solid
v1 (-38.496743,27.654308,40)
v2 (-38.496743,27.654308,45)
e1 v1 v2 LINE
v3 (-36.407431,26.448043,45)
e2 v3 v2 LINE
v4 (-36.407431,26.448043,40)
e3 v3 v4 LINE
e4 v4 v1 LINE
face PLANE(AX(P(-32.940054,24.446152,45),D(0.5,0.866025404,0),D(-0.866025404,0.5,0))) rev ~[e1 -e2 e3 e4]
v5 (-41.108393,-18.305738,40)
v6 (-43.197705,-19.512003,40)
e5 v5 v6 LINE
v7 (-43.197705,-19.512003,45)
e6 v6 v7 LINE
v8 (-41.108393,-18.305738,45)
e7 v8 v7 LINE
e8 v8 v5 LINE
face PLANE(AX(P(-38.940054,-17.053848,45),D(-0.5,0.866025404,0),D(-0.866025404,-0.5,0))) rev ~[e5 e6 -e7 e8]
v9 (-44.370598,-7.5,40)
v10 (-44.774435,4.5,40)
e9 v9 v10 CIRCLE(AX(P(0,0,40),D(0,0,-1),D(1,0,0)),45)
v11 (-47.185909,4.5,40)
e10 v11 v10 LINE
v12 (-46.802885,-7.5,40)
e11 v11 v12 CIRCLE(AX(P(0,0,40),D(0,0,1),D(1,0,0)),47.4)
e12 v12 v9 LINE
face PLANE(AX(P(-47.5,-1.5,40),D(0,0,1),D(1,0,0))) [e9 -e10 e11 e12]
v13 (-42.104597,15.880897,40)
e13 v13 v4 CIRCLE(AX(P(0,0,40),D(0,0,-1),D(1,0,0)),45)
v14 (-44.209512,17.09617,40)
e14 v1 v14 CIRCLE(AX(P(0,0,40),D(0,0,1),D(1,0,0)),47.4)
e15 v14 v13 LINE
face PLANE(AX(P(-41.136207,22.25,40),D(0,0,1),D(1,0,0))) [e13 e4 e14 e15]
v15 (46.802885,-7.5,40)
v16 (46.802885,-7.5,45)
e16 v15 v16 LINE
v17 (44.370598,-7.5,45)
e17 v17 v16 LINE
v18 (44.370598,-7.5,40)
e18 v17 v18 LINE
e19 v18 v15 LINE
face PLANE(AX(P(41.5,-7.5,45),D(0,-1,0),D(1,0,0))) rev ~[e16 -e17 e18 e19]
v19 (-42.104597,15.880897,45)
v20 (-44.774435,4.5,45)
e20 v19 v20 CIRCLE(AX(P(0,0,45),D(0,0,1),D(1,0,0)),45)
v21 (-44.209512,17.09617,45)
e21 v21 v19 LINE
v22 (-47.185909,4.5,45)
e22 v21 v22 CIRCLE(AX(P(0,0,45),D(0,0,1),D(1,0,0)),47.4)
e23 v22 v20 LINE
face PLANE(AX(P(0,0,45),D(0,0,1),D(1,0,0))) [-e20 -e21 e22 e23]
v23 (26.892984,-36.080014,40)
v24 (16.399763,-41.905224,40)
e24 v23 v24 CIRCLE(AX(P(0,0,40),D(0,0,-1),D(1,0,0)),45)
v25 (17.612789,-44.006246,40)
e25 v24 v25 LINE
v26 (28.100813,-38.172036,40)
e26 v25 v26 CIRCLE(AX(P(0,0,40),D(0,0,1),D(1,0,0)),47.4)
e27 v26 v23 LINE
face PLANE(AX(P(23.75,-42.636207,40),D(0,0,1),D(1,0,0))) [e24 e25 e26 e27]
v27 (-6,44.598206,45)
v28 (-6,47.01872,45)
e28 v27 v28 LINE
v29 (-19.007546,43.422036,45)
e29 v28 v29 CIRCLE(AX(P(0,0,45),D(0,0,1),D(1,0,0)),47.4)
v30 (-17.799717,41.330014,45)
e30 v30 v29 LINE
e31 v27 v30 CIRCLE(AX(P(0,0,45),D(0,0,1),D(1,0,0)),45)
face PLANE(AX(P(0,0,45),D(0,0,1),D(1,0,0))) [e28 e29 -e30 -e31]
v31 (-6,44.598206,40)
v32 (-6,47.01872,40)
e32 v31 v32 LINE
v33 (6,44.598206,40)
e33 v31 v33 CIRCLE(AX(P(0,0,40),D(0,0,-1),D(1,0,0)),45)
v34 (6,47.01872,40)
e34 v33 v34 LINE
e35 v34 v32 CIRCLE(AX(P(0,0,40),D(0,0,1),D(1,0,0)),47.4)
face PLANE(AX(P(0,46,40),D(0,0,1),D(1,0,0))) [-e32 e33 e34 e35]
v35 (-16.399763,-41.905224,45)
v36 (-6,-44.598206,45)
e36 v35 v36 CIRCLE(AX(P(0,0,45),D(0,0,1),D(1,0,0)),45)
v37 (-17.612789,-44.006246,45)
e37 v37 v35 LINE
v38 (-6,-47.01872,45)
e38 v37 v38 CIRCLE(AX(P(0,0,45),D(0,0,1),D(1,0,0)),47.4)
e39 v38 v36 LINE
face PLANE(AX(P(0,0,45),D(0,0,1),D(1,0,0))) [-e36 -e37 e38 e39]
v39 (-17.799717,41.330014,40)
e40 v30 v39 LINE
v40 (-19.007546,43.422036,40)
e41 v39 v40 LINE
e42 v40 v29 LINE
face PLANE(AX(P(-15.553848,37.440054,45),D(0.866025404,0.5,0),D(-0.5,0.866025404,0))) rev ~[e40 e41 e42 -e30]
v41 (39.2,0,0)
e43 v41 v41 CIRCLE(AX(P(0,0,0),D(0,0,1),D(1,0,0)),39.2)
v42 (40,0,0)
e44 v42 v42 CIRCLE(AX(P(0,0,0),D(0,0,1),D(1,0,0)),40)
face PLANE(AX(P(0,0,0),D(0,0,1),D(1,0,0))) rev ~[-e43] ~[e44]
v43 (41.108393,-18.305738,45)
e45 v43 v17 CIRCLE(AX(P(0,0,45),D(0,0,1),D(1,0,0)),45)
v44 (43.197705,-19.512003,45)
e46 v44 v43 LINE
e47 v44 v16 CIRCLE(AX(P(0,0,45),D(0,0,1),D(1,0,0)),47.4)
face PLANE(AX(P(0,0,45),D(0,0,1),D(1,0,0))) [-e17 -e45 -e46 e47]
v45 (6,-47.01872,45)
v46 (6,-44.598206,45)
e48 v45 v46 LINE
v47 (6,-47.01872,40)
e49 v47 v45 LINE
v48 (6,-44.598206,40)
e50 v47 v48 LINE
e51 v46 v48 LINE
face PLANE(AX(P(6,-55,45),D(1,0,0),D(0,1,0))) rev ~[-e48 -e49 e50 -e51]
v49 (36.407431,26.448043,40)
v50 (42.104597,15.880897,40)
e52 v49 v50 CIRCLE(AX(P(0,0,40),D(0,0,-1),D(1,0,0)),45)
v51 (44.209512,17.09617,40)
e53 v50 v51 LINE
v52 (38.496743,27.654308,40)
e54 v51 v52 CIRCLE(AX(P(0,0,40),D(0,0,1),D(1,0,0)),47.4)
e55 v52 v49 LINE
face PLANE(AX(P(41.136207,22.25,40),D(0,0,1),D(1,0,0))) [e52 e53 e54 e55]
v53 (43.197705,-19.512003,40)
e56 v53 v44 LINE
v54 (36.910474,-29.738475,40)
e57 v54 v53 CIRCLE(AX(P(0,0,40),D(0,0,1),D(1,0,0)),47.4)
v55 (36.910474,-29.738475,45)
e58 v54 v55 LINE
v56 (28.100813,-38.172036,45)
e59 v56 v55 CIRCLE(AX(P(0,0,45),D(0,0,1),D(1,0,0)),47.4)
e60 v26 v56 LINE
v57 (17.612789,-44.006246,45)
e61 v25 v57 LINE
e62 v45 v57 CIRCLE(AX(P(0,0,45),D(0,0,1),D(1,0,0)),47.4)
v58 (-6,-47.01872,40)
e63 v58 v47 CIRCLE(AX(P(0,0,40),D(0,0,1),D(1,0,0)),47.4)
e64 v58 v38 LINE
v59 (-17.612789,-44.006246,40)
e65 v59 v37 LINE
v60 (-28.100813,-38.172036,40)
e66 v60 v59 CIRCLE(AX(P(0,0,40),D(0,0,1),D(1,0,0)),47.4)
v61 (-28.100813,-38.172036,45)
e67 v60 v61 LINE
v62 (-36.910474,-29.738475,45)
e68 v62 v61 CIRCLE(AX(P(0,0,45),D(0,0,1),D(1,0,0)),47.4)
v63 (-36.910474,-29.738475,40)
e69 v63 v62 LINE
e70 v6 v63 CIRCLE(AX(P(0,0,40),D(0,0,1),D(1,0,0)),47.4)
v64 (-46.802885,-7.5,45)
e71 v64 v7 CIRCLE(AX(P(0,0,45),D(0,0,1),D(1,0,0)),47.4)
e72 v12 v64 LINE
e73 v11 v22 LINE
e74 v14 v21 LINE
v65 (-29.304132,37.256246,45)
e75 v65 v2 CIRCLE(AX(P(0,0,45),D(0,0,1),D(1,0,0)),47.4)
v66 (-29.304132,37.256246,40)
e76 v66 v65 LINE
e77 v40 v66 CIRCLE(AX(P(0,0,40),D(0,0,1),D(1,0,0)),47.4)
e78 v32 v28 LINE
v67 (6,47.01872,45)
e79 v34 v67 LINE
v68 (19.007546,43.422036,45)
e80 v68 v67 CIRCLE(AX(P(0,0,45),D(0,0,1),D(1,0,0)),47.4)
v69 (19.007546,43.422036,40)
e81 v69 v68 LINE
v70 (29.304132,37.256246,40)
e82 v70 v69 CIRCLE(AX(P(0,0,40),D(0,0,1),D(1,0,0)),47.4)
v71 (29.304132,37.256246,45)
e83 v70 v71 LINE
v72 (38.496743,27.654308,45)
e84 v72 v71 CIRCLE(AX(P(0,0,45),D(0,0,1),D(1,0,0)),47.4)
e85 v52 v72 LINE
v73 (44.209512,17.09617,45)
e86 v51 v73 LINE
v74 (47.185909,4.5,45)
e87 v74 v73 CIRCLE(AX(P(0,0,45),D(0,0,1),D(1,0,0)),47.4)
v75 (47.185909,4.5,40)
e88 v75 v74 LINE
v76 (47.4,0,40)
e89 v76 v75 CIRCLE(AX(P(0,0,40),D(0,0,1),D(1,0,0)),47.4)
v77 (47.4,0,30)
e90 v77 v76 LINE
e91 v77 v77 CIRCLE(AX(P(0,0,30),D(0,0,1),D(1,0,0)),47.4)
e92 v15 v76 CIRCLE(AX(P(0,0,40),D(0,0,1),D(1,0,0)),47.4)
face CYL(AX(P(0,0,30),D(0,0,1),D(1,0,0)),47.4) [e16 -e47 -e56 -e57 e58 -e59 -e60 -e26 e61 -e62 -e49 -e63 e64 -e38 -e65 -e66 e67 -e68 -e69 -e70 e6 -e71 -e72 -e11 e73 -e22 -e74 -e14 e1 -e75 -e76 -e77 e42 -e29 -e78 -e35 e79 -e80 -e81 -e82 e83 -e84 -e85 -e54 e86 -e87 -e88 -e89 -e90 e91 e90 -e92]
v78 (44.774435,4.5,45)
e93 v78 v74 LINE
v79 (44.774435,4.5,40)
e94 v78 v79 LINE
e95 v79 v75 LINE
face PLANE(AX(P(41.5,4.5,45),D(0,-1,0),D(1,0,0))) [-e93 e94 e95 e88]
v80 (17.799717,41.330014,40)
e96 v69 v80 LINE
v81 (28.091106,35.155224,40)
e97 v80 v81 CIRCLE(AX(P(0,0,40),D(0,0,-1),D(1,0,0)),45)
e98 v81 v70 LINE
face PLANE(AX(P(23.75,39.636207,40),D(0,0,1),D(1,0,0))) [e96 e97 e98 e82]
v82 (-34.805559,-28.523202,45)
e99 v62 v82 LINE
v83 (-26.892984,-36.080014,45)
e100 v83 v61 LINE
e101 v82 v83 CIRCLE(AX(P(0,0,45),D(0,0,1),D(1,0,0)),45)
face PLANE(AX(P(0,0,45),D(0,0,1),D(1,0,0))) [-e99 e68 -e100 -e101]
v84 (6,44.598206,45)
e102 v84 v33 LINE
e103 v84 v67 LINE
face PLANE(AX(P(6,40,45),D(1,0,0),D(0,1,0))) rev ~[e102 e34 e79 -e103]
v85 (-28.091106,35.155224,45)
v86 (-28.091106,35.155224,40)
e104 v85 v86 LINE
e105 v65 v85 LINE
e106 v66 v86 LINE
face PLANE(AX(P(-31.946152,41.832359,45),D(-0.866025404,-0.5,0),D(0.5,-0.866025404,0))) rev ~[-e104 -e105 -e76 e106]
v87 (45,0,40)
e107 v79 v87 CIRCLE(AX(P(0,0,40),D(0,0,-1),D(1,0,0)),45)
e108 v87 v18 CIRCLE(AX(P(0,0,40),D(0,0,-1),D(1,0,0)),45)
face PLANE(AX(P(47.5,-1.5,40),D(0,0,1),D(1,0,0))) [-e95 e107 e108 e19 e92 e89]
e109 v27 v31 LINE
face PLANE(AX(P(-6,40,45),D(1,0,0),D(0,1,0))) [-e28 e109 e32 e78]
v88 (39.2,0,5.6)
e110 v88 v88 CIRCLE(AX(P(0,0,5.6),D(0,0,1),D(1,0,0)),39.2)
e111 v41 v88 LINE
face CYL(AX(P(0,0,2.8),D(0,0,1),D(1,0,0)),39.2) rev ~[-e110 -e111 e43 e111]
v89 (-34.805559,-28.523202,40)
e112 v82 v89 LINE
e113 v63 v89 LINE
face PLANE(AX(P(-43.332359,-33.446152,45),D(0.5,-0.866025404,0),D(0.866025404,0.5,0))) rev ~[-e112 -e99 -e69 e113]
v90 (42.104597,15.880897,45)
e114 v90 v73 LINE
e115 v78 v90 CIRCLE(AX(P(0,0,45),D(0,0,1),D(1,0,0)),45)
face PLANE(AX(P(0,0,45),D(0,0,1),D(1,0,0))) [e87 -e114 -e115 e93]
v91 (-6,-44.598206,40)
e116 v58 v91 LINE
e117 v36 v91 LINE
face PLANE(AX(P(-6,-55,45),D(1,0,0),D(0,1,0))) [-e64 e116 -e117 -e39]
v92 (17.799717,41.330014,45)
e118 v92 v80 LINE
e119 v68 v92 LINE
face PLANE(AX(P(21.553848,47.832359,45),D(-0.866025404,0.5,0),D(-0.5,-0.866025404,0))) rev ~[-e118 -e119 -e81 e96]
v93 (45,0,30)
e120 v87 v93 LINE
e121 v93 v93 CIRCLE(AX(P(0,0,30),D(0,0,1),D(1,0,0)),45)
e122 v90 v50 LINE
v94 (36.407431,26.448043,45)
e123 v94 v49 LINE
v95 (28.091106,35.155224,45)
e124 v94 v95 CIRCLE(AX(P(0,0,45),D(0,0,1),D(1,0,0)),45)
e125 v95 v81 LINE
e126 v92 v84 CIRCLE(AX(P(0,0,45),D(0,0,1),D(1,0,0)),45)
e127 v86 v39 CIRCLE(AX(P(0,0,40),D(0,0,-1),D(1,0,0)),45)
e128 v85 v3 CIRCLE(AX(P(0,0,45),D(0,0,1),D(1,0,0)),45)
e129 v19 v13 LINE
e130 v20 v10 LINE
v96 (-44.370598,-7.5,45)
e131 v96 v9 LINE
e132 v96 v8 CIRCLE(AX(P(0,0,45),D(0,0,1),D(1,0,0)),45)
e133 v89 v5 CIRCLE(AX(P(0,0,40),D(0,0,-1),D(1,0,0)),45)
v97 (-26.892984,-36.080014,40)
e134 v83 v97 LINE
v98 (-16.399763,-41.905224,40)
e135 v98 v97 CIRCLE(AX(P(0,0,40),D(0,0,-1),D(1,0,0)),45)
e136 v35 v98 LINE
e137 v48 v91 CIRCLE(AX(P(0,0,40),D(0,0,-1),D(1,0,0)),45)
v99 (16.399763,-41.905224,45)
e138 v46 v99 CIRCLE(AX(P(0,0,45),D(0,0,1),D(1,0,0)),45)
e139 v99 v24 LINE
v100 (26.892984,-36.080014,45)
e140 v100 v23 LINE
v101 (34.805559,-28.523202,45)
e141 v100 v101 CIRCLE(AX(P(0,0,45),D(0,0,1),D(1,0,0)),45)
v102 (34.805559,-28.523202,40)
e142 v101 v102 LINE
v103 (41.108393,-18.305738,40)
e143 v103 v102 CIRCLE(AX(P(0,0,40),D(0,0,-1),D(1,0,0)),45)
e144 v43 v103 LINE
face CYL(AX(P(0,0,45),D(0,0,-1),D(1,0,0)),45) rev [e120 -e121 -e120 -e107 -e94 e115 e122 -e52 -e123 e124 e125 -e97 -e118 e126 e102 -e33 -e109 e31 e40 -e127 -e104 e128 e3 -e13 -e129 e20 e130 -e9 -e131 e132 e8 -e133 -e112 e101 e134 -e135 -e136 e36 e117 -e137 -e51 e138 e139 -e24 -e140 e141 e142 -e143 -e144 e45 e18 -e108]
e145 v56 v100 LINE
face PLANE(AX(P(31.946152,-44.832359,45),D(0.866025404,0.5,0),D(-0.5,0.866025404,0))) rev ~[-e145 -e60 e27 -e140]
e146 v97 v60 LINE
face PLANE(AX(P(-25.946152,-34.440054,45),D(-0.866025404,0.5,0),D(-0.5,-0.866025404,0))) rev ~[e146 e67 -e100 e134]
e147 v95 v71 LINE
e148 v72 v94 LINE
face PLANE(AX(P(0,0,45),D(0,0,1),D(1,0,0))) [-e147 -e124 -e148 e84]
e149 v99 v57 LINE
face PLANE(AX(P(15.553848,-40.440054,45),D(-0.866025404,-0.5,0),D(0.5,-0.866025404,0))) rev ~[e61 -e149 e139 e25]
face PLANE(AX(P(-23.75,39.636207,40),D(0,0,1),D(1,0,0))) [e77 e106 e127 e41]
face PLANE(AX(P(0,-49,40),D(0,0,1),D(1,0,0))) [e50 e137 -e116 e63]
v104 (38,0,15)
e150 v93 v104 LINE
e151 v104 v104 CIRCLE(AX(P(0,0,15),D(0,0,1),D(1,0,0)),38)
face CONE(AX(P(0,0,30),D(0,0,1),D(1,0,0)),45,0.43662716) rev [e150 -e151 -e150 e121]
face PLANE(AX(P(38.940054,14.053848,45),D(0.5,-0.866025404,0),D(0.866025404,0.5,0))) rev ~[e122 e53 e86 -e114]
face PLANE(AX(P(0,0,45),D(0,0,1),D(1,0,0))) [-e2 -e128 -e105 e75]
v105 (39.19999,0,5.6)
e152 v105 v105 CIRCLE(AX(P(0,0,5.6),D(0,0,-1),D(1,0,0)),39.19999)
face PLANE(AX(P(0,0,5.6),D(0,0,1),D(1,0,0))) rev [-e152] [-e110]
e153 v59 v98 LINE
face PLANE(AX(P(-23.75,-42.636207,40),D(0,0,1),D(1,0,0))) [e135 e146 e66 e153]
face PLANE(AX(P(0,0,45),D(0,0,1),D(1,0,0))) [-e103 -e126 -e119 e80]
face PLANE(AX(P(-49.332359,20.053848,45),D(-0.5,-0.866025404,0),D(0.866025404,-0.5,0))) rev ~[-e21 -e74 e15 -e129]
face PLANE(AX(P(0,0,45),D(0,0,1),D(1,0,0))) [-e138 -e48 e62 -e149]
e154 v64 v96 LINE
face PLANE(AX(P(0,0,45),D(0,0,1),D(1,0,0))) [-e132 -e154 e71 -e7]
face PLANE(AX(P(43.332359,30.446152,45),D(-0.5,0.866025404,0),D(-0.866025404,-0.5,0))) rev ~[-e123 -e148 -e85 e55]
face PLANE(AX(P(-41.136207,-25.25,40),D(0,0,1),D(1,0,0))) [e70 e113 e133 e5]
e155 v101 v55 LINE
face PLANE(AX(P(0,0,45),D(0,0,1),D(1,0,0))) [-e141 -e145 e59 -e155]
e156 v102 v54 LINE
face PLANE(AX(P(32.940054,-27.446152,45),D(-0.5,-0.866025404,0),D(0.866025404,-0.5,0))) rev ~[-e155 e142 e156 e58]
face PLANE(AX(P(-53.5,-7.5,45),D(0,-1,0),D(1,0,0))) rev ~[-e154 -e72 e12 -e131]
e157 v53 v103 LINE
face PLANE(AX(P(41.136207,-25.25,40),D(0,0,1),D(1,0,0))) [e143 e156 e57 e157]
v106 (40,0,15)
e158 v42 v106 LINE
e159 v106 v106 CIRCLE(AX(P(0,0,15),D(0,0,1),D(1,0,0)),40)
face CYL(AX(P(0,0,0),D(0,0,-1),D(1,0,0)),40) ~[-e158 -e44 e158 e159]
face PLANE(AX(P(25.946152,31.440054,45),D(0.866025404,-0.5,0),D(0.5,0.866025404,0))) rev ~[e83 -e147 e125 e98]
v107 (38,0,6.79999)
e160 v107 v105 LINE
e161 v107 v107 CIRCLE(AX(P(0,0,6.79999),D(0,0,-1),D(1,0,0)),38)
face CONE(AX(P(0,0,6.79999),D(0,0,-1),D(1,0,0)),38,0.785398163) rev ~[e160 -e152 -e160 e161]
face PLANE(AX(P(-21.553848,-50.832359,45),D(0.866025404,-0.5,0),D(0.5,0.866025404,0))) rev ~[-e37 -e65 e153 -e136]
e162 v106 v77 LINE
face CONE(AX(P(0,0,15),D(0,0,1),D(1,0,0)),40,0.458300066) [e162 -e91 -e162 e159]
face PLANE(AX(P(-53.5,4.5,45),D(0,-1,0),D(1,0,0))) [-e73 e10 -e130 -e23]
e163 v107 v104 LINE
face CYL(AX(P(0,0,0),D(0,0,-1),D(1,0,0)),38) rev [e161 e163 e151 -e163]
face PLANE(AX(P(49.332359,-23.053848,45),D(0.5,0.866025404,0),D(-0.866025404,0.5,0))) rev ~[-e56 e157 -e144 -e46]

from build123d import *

# Parameters (mm, degrees)
F0_R     = 40
F0_R_2   = 38
F1_DEPTH = 15
F2_W     = 2
F2_H     = 5.6
F5_W     = 12
F5_H     = 12
F6_DEPTH = 5
F7_SIZE  = 1.19999


# Not quite as in the source:
# - a fillet or chamfer is up to 0.001 mm smaller than in the source, because OpenCascade refuses the exact size


with BuildPart() as f1:
    # F0 (on Top) → F1 (new body)
    with BuildSketch(Plane.XY):
        Circle(F0_R)
        Circle(F0_R_2, mode=Mode.SUBTRACT)
    extrude(amount=F1_DEPTH)

    # F2 (on Front) → F3 (revolve, cut)
    with BuildSketch(Plane.XZ):
        with Locations((38.2, 2.8)):
            Rectangle(F2_W, F2_H)
        Polygon((45, 30), (38, 15), (40, 15), (47.4, 30), (47.4, 45), (45, 45), align=None)
    revolve(axis=Axis((0, 0, 15), (0, 0, 1)), mode=Mode.SUBTRACT)

    # F2 (on Front) → F4 (revolve)
    with BuildSketch(Plane.XZ):
        Polygon((45, 30), (38, 15), (40, 15), (47.4, 30), (47.4, 45), (45, 45), align=None)
    revolve(axis=Axis((0, 0, 15), (0, 0, 1)))

    # F5 (on face) → F6 (cut)
    with BuildSketch(Plane.XY.offset(45)):
        with Locations((0, 46)):
            Rectangle(F5_W, F5_H)
        Polygon((-15.5538475773, 37.4400542571), (-21.5538475773, 47.8323591025), (-31.9461524227, 41.8323591025), (-25.9461524227, 31.4400542571), align=None)
        Polygon((-32.9400542571, 24.4461524227), (-43.3323591025, 30.4461524227), (-49.3323591025, 20.0538475773), (-38.9400542571, 14.0538475773), align=None)
        with Locations((-47.5, -1.5)):
            Rectangle(F5_W, F5_H)
        Polygon((-38.9400542571, -17.0538475773), (-49.3323591025, -23.0538475773), (-43.3323591025, -33.4461524227), (-32.9400542571, -27.4461524227), align=None)
        Polygon((-25.9461524227, -34.4400542571), (-31.9461524227, -44.8323591025), (-21.5538475773, -50.8323591025), (-15.5538475773, -40.4400542571), align=None)
        with Locations((0, -49)):
            Rectangle(F5_W, F5_H)
        Polygon((15.5538475773, -40.4400542571), (21.5538475773, -50.8323591025), (31.9461524227, -44.8323591025), (25.9461524227, -34.4400542571), align=None)
        Polygon((32.9400542571, -27.4461524227), (43.3323591025, -33.4461524227), (49.3323591025, -23.0538475773), (38.9400542571, -17.0538475773), align=None)
        with Locations((47.5, -1.5)):
            Rectangle(F5_W, F5_H)
        Polygon((38.9400542571, 14.0538475773), (49.3323591025, 20.0538475773), (43.3323591025, 30.4461524227), (32.9400542571, 24.4461524227), align=None)
        Polygon((25.9461524227, 31.4400542571), (31.9461524227, 41.8323591025), (21.5538475773, 47.8323591025), (15.5538475773, 37.4400542571), align=None)
    extrude(amount=-F6_DEPTH, mode=Mode.SUBTRACT)

    # F7 (size 1.2 in the source; OpenCascade refuses exactly that, so slightly less here)
    f7_edges = [f1.edges().sort_by_distance(p)[0] for p in [
        (-38, 0, 5.6),
    ]]
    chamfer(f7_edges, length=F7_SIZE)


solid = f1.part
